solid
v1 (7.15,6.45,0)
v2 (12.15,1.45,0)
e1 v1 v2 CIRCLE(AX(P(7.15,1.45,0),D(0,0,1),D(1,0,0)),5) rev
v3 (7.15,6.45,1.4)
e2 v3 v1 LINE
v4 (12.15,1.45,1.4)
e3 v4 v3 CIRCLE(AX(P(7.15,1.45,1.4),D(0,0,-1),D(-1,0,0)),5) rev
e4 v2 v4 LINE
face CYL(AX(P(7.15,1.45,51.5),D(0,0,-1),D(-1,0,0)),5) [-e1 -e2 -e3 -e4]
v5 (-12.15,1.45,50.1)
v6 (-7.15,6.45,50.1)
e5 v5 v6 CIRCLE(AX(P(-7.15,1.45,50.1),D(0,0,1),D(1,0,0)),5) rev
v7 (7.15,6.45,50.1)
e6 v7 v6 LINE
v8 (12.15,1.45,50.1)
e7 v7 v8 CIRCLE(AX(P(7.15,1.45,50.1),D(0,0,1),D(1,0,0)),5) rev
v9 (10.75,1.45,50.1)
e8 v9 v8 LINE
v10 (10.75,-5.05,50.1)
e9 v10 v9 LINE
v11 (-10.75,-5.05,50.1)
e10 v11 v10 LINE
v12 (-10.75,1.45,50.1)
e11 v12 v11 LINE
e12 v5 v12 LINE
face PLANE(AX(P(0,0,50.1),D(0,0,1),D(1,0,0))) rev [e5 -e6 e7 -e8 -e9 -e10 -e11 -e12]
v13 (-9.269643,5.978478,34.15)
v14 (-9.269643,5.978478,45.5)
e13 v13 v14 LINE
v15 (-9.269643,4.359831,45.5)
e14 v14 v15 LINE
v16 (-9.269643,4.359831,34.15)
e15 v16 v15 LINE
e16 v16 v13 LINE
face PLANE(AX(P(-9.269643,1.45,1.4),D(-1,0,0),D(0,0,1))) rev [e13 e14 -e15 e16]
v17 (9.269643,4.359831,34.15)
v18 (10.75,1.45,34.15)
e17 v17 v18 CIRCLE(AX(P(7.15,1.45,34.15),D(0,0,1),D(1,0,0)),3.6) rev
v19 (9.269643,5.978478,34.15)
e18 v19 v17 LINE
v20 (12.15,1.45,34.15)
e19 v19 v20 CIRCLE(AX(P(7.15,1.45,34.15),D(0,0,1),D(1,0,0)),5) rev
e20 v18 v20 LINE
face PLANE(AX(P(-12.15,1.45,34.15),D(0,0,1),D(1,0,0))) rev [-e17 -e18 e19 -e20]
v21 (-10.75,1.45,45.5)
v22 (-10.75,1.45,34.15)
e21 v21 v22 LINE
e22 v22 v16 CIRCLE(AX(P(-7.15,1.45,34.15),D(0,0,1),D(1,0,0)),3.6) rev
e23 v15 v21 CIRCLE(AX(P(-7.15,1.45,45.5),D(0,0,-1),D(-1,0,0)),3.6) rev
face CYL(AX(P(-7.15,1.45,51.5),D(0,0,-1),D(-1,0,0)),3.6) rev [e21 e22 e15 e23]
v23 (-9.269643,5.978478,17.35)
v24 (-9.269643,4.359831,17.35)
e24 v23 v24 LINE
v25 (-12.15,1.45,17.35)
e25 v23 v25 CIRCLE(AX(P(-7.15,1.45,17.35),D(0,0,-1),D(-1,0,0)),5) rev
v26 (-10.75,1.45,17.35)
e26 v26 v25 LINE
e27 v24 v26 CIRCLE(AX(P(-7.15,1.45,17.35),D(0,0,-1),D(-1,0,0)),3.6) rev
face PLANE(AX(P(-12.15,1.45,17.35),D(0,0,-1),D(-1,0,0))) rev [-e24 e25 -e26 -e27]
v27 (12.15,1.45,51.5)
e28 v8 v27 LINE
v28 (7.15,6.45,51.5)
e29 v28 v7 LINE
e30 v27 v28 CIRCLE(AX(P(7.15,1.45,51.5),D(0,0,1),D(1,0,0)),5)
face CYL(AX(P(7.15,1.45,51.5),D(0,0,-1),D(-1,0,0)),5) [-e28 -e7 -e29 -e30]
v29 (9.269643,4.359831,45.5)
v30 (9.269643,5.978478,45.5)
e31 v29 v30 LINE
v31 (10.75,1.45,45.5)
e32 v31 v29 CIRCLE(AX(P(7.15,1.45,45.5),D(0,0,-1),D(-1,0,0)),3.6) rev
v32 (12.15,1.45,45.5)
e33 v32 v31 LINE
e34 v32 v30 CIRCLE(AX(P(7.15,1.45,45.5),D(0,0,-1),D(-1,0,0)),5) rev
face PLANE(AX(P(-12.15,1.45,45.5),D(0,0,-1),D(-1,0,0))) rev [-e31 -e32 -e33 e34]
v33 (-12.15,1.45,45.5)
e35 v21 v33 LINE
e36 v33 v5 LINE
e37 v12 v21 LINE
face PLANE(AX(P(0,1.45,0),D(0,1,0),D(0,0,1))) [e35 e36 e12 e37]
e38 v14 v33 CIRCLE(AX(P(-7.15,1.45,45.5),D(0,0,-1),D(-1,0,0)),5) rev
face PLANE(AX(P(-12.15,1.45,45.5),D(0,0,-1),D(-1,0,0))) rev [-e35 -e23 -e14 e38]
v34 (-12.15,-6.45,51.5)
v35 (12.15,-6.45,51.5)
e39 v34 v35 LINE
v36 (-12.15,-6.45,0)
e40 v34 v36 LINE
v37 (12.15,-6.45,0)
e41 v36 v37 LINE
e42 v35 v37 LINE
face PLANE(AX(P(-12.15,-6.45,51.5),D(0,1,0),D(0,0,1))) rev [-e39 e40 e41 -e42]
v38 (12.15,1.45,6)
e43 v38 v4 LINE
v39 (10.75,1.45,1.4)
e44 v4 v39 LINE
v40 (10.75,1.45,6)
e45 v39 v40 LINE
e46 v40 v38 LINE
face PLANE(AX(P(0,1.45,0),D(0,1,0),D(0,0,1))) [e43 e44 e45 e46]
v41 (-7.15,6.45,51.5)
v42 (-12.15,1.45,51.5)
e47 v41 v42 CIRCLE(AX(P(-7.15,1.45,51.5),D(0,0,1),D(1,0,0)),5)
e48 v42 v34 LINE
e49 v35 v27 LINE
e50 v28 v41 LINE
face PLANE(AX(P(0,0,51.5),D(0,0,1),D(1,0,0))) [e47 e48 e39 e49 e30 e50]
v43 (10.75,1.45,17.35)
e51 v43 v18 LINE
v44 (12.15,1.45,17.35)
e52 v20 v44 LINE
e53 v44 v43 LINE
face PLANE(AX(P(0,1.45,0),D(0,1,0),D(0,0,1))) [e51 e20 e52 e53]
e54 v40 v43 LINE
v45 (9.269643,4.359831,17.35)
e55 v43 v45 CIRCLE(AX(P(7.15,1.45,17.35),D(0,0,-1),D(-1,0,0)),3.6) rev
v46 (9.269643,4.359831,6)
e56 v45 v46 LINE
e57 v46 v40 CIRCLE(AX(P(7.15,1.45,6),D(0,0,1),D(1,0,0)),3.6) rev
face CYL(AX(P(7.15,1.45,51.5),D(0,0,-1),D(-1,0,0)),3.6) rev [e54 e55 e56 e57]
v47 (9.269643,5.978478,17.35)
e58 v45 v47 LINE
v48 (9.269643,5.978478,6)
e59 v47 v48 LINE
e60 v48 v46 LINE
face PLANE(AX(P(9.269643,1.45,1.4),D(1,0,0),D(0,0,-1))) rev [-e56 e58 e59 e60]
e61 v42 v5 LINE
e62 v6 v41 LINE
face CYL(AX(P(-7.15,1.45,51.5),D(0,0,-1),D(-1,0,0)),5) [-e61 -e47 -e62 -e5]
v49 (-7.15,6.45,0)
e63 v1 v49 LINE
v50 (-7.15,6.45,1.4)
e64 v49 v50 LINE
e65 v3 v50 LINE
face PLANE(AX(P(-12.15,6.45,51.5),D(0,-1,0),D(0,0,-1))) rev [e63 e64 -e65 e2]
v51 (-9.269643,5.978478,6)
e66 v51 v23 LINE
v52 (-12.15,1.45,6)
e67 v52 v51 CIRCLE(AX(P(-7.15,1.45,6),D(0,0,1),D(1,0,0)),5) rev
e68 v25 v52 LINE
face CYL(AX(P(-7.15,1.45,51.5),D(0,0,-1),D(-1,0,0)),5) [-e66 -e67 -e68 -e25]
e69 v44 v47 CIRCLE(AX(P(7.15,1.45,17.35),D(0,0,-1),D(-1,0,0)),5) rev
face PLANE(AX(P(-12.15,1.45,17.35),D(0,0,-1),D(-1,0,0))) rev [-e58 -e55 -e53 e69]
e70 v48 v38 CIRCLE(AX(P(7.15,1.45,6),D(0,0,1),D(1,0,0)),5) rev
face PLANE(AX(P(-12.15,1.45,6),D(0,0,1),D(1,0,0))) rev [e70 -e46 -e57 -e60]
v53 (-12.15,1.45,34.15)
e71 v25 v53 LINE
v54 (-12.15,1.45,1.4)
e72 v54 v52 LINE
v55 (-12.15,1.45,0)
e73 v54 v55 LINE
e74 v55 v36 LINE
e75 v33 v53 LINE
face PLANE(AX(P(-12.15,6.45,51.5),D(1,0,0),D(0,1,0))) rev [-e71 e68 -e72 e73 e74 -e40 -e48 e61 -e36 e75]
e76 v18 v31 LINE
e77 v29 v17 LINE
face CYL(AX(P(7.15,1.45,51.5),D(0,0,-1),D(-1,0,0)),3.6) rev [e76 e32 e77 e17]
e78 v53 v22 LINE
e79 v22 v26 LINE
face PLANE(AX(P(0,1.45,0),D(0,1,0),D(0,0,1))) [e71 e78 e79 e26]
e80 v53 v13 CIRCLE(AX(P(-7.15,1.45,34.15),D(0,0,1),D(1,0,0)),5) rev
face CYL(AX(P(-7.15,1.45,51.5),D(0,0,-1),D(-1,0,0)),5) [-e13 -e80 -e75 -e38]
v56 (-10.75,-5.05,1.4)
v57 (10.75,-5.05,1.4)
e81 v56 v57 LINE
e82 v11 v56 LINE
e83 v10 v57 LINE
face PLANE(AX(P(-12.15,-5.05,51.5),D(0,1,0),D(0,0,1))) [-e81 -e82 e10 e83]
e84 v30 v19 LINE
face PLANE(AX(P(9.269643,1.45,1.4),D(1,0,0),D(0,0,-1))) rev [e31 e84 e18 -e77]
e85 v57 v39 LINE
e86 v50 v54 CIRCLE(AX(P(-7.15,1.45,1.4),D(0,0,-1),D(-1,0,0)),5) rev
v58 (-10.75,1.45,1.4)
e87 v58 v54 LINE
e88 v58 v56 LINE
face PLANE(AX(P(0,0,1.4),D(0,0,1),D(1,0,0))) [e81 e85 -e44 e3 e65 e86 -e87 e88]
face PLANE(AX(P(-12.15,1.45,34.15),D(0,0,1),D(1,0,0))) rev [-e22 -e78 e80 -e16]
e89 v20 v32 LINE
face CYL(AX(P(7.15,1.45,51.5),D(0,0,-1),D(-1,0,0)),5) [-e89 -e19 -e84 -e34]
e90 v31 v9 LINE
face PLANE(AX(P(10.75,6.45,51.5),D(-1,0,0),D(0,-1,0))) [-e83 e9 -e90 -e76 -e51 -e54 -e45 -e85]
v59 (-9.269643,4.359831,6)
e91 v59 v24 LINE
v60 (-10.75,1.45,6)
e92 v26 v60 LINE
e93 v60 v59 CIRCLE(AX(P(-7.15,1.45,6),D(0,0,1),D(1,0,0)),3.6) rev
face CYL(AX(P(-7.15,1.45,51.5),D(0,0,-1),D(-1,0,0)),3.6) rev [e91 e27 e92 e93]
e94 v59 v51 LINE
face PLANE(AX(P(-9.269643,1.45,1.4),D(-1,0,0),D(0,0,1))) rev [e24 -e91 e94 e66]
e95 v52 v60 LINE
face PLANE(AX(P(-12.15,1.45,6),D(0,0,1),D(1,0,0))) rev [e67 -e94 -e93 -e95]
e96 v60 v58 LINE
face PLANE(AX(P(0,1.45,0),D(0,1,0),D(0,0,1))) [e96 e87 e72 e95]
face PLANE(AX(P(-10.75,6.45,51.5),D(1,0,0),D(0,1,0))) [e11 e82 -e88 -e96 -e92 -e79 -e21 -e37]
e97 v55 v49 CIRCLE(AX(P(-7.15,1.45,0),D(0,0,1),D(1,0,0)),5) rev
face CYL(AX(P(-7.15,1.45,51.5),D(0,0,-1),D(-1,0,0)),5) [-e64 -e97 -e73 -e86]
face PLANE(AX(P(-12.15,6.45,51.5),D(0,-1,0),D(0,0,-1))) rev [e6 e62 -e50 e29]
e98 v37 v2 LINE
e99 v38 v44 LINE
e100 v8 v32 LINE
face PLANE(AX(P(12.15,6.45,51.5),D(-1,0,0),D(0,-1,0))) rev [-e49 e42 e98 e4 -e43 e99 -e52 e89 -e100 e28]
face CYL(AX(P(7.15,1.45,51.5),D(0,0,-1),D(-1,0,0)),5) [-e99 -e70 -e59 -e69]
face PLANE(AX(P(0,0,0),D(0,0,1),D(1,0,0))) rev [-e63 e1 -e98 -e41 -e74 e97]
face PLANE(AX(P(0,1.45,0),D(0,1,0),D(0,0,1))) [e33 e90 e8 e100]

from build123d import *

# Parameters (mm, degrees)
SKETCH1_W           = 24.3
SKETCH1_H           = 12.9
BOSS_EXTRUDE1_DEPTH = 51.5
FILLET1_R           = 5
SHELL1_START        = 1.4
SHELL1_DEPTH        = 48.7
SKETCH2_W           = 18.539285396
SKETCH2_H           = 48.7
CUT_EXTRUDE1_DEPTH  = 5
SKETCH3_W           = 24.3
SKETCH3_H           = 4.6
SKETCH3_H_2         = 16.8
CUT_EXTRUDE2_DEPTH  = 5


# Read off the part's stored shape, not the designer's step: Shell1
with BuildPart() as part:
    # Sketch1 → Boss-Extrude1 (new body)
    with BuildSketch(Plane.XY):
        Rectangle(SKETCH1_W, SKETCH1_H)
    extrude(amount=BOSS_EXTRUDE1_DEPTH)

    # Fillet1
    fillet1_edges = [part.edges().sort_by_distance(p)[0] for p in [
        (-12.15, 6.45, 25.75),
        (12.15, 6.45, 25.75),
    ]]
    fillet(fillet1_edges, radius=FILLET1_R)

    # Shell1 outline → Shell1 (cut)
    with BuildSketch(Plane.XY.offset(SHELL1_START)):
        with BuildLine():
            Line((7.15, 5.05), (7.15, 6.45))
            Line((7.15, 6.45), (-7.15, 6.45))
            Line((-7.15, 6.45), (-7.15, 5.05))
            ThreePointArc((-7.15, 5.05), (-9.695584412, 3.995584412), (-10.75, 1.45))
            Line((-10.75, 1.45), (-10.75, -5.05))
            Line((-10.75, -5.05), (10.75, -5.05))
            Line((10.75, -5.05), (10.75, 1.45))
            ThreePointArc((10.75, 1.45), (9.695584412, 3.995584412), (7.15, 5.05))
        make_face()
    extrude(amount=SHELL1_DEPTH, mode=Mode.SUBTRACT)

    # Sketch2 → Cut-Extrude1 (cut)
    with BuildSketch(Plane(origin=(0, 6.45, 0), x_dir=(1, 0, 0), z_dir=(0, 1, 0))):
        with Locations((0, -25.75)):
            Rectangle(SKETCH2_W, SKETCH2_H)
    extrude(amount=-CUT_EXTRUDE1_DEPTH, mode=Mode.SUBTRACT)

    # Sketch3 → Cut-Extrude2 (cut)
    with BuildSketch(Plane(origin=(0, 6.45, 0), x_dir=(1, 0, 0), z_dir=(0, 1, 0))):
        with Locations((0, -3.7)):
            Rectangle(SKETCH3_W, SKETCH3_H)
        with Locations((0, -47.8)):
            Rectangle(SKETCH3_W, SKETCH3_H)
        with Locations((0, -25.75)):
            Rectangle(SKETCH3_W, SKETCH3_H_2)
    extrude(amount=-CUT_EXTRUDE2_DEPTH, mode=Mode.SUBTRACT)


solid = part.part
